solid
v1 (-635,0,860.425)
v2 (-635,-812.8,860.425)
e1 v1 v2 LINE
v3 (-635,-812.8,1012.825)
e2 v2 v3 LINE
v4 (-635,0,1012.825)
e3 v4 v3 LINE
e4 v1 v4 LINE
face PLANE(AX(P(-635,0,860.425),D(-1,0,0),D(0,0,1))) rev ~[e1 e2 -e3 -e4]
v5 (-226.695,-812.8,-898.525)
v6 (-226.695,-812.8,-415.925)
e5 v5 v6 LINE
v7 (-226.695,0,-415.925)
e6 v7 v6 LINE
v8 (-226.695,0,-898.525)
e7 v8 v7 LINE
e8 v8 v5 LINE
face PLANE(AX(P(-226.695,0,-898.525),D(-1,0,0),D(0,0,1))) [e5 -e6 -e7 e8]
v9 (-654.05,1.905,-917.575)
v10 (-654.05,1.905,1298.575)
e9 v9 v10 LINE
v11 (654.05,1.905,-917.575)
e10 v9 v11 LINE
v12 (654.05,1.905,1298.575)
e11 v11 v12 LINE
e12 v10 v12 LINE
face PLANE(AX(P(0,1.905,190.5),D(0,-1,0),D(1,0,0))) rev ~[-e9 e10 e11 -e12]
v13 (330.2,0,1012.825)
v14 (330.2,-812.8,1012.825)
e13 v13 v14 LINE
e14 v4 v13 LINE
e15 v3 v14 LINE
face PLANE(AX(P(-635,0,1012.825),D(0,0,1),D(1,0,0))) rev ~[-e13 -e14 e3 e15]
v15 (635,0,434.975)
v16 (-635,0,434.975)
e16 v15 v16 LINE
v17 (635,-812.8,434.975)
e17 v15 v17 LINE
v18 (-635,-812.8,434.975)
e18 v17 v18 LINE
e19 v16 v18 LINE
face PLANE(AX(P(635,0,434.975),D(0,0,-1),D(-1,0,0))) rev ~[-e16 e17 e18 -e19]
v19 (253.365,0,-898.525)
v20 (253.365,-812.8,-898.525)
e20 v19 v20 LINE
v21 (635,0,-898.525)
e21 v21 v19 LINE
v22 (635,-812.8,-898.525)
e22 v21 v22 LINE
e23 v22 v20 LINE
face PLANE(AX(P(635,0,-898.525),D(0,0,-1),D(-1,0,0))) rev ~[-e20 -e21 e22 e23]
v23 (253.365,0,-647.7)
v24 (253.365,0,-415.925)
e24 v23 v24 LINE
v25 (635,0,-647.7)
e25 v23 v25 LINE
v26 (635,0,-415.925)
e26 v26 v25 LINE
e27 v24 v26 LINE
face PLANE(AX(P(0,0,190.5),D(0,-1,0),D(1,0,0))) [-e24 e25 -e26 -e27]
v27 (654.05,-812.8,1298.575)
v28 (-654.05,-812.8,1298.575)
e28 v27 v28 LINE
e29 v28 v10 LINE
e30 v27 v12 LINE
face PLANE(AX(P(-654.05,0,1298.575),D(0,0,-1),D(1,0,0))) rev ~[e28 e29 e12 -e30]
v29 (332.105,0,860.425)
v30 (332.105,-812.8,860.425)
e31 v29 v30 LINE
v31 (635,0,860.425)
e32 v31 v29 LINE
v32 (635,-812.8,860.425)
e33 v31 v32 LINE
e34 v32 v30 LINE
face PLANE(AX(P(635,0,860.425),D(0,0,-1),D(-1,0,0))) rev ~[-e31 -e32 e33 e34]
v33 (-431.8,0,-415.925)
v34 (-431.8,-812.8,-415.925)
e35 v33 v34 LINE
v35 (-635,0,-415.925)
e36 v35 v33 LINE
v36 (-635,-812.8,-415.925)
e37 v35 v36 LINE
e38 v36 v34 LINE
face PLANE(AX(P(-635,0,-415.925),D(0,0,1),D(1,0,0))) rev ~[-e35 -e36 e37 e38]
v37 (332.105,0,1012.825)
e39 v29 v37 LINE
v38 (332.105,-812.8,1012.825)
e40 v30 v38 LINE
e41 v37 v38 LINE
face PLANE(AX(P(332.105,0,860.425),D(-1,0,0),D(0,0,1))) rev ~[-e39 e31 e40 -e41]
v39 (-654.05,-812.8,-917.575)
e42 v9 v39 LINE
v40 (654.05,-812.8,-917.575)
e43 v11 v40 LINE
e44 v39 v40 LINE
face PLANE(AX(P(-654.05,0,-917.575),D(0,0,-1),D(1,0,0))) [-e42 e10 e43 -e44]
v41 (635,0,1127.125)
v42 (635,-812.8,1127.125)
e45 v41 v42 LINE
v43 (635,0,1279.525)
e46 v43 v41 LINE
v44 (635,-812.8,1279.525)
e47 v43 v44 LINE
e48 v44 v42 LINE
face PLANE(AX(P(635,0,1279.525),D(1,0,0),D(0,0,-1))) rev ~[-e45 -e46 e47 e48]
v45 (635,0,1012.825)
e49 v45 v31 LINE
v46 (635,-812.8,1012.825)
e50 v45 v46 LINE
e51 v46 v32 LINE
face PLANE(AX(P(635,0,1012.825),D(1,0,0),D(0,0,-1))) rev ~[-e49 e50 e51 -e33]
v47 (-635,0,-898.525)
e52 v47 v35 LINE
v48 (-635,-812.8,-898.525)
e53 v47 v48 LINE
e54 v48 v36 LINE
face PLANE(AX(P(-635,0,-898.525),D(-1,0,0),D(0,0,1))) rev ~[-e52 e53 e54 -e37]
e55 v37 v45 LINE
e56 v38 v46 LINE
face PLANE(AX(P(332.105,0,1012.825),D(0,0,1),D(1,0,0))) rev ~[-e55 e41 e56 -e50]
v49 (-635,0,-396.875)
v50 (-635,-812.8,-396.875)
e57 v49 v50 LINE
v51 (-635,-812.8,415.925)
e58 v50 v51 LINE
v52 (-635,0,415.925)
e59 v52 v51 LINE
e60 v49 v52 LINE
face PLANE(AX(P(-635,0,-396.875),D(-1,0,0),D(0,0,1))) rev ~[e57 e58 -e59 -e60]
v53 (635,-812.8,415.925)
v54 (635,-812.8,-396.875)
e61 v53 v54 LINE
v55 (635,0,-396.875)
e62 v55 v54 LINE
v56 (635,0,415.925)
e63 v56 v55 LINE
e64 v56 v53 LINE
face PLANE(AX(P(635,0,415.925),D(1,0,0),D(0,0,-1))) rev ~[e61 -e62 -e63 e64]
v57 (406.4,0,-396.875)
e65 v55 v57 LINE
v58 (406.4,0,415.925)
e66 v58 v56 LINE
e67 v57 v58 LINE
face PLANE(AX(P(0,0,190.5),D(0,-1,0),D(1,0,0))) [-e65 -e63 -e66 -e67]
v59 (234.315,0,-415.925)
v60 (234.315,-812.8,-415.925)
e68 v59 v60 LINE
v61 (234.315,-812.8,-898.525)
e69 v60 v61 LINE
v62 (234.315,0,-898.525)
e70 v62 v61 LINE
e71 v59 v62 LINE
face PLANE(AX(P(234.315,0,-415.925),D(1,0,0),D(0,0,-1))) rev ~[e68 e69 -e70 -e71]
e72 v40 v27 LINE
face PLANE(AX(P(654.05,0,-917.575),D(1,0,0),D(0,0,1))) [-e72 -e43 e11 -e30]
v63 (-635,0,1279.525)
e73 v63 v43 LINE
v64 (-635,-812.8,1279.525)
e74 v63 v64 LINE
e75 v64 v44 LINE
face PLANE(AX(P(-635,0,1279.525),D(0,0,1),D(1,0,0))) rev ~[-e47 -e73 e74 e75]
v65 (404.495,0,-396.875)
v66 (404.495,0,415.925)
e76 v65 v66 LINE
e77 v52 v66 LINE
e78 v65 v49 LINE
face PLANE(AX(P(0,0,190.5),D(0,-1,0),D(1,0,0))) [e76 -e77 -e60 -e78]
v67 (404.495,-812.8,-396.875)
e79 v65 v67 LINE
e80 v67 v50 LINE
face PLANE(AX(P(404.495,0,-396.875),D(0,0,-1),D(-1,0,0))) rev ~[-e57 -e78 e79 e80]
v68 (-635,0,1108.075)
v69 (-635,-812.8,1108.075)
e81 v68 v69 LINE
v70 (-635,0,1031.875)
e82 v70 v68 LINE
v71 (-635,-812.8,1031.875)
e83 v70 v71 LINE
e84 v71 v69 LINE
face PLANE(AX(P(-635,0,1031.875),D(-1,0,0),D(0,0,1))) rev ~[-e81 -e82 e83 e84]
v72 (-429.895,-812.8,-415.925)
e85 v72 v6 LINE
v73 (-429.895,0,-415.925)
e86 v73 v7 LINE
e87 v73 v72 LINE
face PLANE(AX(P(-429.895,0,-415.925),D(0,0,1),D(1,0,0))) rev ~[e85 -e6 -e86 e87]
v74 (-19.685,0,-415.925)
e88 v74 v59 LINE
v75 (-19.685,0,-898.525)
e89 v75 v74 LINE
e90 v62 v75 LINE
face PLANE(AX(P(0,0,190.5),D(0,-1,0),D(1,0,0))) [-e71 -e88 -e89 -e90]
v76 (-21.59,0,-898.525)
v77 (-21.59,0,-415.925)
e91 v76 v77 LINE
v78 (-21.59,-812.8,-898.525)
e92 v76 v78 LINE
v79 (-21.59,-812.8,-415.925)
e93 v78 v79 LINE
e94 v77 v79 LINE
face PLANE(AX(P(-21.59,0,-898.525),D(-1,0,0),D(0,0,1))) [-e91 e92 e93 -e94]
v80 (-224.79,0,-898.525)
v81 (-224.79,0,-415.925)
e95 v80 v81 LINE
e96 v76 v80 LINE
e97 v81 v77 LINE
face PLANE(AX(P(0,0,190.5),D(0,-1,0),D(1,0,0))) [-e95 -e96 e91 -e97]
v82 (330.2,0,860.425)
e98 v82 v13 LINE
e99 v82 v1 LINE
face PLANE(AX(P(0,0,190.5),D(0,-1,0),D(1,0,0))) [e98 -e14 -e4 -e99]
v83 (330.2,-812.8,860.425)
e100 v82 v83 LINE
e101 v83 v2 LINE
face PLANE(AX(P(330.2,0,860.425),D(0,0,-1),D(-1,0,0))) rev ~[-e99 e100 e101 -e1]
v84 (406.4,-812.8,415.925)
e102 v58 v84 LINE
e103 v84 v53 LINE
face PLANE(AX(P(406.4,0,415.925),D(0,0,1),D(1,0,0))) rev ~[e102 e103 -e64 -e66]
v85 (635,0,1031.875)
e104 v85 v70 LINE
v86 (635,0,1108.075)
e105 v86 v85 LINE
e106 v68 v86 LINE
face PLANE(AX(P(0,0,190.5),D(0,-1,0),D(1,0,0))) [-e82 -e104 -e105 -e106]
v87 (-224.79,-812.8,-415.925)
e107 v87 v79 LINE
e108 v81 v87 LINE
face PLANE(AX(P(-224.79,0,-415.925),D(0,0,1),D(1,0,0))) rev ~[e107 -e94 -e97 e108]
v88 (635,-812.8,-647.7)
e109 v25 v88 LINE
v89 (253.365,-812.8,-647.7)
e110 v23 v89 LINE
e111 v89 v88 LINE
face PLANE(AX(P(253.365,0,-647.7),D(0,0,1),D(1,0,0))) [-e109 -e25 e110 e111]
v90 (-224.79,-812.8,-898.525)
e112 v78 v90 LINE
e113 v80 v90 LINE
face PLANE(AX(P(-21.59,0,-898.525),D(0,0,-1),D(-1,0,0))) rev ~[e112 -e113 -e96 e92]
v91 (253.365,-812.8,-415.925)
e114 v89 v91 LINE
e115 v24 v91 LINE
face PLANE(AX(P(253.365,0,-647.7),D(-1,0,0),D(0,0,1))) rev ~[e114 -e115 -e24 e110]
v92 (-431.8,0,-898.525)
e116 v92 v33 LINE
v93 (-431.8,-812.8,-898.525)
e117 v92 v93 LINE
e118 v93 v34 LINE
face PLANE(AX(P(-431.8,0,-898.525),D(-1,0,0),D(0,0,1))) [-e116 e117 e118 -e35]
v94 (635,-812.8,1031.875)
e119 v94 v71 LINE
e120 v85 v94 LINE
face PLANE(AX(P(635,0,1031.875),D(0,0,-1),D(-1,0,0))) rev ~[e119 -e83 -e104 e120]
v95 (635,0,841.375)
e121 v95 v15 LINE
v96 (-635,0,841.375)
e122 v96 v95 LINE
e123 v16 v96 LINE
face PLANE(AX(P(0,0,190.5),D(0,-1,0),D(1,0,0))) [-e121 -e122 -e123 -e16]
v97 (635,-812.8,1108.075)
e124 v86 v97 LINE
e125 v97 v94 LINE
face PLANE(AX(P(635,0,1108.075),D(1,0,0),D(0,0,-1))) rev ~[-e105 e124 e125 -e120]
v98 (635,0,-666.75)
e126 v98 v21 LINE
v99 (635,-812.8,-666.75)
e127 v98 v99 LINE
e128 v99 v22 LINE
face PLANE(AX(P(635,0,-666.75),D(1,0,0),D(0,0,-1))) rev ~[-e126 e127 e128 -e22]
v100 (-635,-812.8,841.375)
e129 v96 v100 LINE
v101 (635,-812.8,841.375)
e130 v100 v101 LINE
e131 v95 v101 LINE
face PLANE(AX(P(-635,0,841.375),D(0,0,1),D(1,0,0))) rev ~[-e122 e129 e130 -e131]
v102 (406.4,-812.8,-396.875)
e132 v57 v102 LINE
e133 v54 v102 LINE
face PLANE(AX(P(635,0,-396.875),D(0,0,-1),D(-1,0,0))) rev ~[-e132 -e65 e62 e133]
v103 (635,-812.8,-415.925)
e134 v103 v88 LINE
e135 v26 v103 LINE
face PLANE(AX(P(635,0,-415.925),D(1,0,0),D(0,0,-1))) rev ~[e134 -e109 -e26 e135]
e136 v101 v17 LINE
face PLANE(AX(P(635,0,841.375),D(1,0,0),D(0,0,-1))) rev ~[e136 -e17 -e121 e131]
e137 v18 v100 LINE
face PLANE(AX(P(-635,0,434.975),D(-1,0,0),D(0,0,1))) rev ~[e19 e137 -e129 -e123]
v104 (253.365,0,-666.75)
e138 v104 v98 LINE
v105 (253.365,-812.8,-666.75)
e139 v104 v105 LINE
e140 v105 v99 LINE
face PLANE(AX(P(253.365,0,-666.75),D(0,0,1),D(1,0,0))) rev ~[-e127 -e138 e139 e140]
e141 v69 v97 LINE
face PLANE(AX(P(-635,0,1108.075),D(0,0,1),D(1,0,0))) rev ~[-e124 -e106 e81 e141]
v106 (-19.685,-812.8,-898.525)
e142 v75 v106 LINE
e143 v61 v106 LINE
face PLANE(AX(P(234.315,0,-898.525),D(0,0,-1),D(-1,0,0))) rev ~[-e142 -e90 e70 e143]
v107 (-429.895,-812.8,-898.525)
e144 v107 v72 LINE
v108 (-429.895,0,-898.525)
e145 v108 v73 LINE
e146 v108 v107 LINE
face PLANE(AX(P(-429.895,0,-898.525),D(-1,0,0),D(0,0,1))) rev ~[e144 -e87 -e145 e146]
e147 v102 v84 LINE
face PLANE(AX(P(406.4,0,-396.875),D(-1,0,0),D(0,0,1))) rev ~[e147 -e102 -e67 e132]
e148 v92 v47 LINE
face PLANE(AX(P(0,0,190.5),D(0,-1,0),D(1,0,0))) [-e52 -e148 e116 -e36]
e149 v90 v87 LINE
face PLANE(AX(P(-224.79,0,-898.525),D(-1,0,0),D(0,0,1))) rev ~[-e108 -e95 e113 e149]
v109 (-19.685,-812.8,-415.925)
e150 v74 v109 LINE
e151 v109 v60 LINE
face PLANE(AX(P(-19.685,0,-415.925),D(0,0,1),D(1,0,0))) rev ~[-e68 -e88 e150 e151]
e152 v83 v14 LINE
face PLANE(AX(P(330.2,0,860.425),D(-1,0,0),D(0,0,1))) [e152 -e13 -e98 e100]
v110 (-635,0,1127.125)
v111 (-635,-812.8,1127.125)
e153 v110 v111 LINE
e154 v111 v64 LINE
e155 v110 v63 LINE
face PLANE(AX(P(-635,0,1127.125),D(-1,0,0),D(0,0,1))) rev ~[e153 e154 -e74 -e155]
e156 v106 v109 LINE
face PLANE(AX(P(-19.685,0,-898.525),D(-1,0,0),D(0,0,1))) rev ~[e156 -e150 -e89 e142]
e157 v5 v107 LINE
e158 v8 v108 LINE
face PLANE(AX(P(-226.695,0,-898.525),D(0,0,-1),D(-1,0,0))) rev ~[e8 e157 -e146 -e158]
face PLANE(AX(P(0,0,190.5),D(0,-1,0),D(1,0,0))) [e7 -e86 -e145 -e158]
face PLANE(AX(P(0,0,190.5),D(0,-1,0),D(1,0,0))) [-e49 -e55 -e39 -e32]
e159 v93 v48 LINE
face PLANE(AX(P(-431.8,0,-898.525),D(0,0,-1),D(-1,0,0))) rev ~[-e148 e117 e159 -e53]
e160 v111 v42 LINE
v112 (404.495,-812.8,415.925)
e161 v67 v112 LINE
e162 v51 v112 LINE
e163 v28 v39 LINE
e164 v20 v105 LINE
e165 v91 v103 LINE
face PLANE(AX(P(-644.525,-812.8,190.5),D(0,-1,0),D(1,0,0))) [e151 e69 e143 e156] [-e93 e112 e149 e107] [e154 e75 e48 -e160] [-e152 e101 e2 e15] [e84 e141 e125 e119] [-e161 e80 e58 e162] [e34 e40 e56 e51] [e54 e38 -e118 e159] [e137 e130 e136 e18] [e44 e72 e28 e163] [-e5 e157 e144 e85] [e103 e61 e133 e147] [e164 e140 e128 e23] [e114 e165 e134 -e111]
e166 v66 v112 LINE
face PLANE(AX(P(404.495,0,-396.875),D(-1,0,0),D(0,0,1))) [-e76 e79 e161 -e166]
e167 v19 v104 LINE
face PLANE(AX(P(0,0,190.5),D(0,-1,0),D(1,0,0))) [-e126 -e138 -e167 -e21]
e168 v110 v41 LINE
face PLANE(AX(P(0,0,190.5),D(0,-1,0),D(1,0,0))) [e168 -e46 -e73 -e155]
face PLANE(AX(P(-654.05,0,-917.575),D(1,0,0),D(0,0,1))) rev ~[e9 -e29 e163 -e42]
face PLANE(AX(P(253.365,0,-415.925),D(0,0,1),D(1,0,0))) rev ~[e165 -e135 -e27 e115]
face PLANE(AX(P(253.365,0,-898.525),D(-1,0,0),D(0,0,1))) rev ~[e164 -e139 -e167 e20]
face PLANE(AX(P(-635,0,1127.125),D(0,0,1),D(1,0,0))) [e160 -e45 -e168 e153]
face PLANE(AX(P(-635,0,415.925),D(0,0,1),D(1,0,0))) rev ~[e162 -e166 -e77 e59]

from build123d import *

# Parameters (mm, degrees)
F0_W     = 1270
F0_H     = 19.05
F0_W_2   = 1.905
F0_H_2   = 482.6
F0_H_3   = 152.4
F0_H_4   = 812.8
F0_W_3   = 381.635
F1_DEPTH = 812.8
F3_START = -812.8
F2_W     = 1308.1
F2_H     = 2216.15
F3_DEPTH = 1.905


# Not quite as in the source:
# - a feature names something its author has since deleted; it is built from what else it names


with BuildPart() as f1:
    # F0 (on Front) → F1 (new body)
    with BuildSketch(Plane.XZ):
        Polygon((-635, -396.875), (-635, 415.925), (-635, 434.975), (-635, 841.375), (-635, 860.425), (-635, 1012.825), (-635, 1031.875), (-635, 1108.075), (-635, 1127.125), (-635, 1279.525), (-635, 1298.575), (-654.05, 1298.575), (-654.05, -917.575), (-635, -917.575), (-635, -898.525), (-635, -415.925), align=None)
        Polygon((-635, 434.975), (-635, 415.925), (404.495, 415.925), (406.4, 415.925), (635, 415.925), (635, 434.975), align=None)
        Polygon((-635, 860.425), (-635, 841.375), (635, 841.375), (635, 860.425), (332.105, 860.425), (330.2, 860.425), (0, 860.425), align=None)
        Polygon((-635, 1031.875), (-635, 1012.825), (0, 1012.825), (330.2, 1012.825), (332.105, 1012.825), (635, 1012.825), (635, 1031.875), align=None)
        with Locations((0, 1289.05)):
            Rectangle(F0_W, F0_H)
        Polygon((635, 841.375), (635, 434.975), (635, 415.925), (635, -396.875), (635, -415.925), (635, -647.7), (635, -666.75), (635, -898.525), (635, -917.575), (654.05, -917.575), (654.05, 1298.575), (635, 1298.575), (635, 1279.525), (635, 1127.125), (635, 1108.075), (635, 1031.875), (635, 1012.825), (635, 860.425), align=None)
        Polygon((404.495, -396.875), (-635, -396.875), (-635, -415.925), (-431.8, -415.925), (-429.895, -415.925), (-226.695, -415.925), (-224.79, -415.925), (-21.59, -415.925), (-19.685, -415.925), (234.315, -415.925), (253.365, -415.925), (635, -415.925), (635, -396.875), (406.4, -396.875), align=None)
        Polygon((-431.8, -898.525), (-635, -898.525), (-635, -917.575), (635, -917.575), (635, -898.525), (253.365, -898.525), (234.315, -898.525), (-19.685, -898.525), (-21.59, -898.525), (-224.79, -898.525), (-226.695, -898.525), (-429.895, -898.525), align=None)
        with Locations((-430.8475, -657.225)):
            Rectangle(F0_W_2, F0_H_2)
        with Locations((-225.7425, -657.225)):
            Rectangle(F0_W_2, F0_H_2)
        with Locations((-20.6375, -657.225)):
            Rectangle(F0_W_2, F0_H_2)
        with Locations((0, 1117.6)):
            Rectangle(F0_W, F0_H)
        with Locations((331.1525, 936.625)):
            Rectangle(F0_W_2, F0_H_3)
        with Locations((405.4475, 9.525)):
            Rectangle(F0_W_2, F0_H_4)
        Polygon((253.365, -647.7), (253.365, -415.925), (234.315, -415.925), (234.315, -898.525), (253.365, -898.525), (253.365, -666.75), align=None)
        with Locations((444.1825, -657.225)):
            Rectangle(F0_W_3, F0_H)
    extrude(amount=F1_DEPTH)

    # F2 (on face) → F3 (join)
    with BuildSketch(Plane.XZ.offset(812.8).offset(F3_START)):
        with Locations((0, 190.5)):
            Rectangle(F2_W, F2_H)
    extrude(amount=-F3_DEPTH)


solid = f1.part
